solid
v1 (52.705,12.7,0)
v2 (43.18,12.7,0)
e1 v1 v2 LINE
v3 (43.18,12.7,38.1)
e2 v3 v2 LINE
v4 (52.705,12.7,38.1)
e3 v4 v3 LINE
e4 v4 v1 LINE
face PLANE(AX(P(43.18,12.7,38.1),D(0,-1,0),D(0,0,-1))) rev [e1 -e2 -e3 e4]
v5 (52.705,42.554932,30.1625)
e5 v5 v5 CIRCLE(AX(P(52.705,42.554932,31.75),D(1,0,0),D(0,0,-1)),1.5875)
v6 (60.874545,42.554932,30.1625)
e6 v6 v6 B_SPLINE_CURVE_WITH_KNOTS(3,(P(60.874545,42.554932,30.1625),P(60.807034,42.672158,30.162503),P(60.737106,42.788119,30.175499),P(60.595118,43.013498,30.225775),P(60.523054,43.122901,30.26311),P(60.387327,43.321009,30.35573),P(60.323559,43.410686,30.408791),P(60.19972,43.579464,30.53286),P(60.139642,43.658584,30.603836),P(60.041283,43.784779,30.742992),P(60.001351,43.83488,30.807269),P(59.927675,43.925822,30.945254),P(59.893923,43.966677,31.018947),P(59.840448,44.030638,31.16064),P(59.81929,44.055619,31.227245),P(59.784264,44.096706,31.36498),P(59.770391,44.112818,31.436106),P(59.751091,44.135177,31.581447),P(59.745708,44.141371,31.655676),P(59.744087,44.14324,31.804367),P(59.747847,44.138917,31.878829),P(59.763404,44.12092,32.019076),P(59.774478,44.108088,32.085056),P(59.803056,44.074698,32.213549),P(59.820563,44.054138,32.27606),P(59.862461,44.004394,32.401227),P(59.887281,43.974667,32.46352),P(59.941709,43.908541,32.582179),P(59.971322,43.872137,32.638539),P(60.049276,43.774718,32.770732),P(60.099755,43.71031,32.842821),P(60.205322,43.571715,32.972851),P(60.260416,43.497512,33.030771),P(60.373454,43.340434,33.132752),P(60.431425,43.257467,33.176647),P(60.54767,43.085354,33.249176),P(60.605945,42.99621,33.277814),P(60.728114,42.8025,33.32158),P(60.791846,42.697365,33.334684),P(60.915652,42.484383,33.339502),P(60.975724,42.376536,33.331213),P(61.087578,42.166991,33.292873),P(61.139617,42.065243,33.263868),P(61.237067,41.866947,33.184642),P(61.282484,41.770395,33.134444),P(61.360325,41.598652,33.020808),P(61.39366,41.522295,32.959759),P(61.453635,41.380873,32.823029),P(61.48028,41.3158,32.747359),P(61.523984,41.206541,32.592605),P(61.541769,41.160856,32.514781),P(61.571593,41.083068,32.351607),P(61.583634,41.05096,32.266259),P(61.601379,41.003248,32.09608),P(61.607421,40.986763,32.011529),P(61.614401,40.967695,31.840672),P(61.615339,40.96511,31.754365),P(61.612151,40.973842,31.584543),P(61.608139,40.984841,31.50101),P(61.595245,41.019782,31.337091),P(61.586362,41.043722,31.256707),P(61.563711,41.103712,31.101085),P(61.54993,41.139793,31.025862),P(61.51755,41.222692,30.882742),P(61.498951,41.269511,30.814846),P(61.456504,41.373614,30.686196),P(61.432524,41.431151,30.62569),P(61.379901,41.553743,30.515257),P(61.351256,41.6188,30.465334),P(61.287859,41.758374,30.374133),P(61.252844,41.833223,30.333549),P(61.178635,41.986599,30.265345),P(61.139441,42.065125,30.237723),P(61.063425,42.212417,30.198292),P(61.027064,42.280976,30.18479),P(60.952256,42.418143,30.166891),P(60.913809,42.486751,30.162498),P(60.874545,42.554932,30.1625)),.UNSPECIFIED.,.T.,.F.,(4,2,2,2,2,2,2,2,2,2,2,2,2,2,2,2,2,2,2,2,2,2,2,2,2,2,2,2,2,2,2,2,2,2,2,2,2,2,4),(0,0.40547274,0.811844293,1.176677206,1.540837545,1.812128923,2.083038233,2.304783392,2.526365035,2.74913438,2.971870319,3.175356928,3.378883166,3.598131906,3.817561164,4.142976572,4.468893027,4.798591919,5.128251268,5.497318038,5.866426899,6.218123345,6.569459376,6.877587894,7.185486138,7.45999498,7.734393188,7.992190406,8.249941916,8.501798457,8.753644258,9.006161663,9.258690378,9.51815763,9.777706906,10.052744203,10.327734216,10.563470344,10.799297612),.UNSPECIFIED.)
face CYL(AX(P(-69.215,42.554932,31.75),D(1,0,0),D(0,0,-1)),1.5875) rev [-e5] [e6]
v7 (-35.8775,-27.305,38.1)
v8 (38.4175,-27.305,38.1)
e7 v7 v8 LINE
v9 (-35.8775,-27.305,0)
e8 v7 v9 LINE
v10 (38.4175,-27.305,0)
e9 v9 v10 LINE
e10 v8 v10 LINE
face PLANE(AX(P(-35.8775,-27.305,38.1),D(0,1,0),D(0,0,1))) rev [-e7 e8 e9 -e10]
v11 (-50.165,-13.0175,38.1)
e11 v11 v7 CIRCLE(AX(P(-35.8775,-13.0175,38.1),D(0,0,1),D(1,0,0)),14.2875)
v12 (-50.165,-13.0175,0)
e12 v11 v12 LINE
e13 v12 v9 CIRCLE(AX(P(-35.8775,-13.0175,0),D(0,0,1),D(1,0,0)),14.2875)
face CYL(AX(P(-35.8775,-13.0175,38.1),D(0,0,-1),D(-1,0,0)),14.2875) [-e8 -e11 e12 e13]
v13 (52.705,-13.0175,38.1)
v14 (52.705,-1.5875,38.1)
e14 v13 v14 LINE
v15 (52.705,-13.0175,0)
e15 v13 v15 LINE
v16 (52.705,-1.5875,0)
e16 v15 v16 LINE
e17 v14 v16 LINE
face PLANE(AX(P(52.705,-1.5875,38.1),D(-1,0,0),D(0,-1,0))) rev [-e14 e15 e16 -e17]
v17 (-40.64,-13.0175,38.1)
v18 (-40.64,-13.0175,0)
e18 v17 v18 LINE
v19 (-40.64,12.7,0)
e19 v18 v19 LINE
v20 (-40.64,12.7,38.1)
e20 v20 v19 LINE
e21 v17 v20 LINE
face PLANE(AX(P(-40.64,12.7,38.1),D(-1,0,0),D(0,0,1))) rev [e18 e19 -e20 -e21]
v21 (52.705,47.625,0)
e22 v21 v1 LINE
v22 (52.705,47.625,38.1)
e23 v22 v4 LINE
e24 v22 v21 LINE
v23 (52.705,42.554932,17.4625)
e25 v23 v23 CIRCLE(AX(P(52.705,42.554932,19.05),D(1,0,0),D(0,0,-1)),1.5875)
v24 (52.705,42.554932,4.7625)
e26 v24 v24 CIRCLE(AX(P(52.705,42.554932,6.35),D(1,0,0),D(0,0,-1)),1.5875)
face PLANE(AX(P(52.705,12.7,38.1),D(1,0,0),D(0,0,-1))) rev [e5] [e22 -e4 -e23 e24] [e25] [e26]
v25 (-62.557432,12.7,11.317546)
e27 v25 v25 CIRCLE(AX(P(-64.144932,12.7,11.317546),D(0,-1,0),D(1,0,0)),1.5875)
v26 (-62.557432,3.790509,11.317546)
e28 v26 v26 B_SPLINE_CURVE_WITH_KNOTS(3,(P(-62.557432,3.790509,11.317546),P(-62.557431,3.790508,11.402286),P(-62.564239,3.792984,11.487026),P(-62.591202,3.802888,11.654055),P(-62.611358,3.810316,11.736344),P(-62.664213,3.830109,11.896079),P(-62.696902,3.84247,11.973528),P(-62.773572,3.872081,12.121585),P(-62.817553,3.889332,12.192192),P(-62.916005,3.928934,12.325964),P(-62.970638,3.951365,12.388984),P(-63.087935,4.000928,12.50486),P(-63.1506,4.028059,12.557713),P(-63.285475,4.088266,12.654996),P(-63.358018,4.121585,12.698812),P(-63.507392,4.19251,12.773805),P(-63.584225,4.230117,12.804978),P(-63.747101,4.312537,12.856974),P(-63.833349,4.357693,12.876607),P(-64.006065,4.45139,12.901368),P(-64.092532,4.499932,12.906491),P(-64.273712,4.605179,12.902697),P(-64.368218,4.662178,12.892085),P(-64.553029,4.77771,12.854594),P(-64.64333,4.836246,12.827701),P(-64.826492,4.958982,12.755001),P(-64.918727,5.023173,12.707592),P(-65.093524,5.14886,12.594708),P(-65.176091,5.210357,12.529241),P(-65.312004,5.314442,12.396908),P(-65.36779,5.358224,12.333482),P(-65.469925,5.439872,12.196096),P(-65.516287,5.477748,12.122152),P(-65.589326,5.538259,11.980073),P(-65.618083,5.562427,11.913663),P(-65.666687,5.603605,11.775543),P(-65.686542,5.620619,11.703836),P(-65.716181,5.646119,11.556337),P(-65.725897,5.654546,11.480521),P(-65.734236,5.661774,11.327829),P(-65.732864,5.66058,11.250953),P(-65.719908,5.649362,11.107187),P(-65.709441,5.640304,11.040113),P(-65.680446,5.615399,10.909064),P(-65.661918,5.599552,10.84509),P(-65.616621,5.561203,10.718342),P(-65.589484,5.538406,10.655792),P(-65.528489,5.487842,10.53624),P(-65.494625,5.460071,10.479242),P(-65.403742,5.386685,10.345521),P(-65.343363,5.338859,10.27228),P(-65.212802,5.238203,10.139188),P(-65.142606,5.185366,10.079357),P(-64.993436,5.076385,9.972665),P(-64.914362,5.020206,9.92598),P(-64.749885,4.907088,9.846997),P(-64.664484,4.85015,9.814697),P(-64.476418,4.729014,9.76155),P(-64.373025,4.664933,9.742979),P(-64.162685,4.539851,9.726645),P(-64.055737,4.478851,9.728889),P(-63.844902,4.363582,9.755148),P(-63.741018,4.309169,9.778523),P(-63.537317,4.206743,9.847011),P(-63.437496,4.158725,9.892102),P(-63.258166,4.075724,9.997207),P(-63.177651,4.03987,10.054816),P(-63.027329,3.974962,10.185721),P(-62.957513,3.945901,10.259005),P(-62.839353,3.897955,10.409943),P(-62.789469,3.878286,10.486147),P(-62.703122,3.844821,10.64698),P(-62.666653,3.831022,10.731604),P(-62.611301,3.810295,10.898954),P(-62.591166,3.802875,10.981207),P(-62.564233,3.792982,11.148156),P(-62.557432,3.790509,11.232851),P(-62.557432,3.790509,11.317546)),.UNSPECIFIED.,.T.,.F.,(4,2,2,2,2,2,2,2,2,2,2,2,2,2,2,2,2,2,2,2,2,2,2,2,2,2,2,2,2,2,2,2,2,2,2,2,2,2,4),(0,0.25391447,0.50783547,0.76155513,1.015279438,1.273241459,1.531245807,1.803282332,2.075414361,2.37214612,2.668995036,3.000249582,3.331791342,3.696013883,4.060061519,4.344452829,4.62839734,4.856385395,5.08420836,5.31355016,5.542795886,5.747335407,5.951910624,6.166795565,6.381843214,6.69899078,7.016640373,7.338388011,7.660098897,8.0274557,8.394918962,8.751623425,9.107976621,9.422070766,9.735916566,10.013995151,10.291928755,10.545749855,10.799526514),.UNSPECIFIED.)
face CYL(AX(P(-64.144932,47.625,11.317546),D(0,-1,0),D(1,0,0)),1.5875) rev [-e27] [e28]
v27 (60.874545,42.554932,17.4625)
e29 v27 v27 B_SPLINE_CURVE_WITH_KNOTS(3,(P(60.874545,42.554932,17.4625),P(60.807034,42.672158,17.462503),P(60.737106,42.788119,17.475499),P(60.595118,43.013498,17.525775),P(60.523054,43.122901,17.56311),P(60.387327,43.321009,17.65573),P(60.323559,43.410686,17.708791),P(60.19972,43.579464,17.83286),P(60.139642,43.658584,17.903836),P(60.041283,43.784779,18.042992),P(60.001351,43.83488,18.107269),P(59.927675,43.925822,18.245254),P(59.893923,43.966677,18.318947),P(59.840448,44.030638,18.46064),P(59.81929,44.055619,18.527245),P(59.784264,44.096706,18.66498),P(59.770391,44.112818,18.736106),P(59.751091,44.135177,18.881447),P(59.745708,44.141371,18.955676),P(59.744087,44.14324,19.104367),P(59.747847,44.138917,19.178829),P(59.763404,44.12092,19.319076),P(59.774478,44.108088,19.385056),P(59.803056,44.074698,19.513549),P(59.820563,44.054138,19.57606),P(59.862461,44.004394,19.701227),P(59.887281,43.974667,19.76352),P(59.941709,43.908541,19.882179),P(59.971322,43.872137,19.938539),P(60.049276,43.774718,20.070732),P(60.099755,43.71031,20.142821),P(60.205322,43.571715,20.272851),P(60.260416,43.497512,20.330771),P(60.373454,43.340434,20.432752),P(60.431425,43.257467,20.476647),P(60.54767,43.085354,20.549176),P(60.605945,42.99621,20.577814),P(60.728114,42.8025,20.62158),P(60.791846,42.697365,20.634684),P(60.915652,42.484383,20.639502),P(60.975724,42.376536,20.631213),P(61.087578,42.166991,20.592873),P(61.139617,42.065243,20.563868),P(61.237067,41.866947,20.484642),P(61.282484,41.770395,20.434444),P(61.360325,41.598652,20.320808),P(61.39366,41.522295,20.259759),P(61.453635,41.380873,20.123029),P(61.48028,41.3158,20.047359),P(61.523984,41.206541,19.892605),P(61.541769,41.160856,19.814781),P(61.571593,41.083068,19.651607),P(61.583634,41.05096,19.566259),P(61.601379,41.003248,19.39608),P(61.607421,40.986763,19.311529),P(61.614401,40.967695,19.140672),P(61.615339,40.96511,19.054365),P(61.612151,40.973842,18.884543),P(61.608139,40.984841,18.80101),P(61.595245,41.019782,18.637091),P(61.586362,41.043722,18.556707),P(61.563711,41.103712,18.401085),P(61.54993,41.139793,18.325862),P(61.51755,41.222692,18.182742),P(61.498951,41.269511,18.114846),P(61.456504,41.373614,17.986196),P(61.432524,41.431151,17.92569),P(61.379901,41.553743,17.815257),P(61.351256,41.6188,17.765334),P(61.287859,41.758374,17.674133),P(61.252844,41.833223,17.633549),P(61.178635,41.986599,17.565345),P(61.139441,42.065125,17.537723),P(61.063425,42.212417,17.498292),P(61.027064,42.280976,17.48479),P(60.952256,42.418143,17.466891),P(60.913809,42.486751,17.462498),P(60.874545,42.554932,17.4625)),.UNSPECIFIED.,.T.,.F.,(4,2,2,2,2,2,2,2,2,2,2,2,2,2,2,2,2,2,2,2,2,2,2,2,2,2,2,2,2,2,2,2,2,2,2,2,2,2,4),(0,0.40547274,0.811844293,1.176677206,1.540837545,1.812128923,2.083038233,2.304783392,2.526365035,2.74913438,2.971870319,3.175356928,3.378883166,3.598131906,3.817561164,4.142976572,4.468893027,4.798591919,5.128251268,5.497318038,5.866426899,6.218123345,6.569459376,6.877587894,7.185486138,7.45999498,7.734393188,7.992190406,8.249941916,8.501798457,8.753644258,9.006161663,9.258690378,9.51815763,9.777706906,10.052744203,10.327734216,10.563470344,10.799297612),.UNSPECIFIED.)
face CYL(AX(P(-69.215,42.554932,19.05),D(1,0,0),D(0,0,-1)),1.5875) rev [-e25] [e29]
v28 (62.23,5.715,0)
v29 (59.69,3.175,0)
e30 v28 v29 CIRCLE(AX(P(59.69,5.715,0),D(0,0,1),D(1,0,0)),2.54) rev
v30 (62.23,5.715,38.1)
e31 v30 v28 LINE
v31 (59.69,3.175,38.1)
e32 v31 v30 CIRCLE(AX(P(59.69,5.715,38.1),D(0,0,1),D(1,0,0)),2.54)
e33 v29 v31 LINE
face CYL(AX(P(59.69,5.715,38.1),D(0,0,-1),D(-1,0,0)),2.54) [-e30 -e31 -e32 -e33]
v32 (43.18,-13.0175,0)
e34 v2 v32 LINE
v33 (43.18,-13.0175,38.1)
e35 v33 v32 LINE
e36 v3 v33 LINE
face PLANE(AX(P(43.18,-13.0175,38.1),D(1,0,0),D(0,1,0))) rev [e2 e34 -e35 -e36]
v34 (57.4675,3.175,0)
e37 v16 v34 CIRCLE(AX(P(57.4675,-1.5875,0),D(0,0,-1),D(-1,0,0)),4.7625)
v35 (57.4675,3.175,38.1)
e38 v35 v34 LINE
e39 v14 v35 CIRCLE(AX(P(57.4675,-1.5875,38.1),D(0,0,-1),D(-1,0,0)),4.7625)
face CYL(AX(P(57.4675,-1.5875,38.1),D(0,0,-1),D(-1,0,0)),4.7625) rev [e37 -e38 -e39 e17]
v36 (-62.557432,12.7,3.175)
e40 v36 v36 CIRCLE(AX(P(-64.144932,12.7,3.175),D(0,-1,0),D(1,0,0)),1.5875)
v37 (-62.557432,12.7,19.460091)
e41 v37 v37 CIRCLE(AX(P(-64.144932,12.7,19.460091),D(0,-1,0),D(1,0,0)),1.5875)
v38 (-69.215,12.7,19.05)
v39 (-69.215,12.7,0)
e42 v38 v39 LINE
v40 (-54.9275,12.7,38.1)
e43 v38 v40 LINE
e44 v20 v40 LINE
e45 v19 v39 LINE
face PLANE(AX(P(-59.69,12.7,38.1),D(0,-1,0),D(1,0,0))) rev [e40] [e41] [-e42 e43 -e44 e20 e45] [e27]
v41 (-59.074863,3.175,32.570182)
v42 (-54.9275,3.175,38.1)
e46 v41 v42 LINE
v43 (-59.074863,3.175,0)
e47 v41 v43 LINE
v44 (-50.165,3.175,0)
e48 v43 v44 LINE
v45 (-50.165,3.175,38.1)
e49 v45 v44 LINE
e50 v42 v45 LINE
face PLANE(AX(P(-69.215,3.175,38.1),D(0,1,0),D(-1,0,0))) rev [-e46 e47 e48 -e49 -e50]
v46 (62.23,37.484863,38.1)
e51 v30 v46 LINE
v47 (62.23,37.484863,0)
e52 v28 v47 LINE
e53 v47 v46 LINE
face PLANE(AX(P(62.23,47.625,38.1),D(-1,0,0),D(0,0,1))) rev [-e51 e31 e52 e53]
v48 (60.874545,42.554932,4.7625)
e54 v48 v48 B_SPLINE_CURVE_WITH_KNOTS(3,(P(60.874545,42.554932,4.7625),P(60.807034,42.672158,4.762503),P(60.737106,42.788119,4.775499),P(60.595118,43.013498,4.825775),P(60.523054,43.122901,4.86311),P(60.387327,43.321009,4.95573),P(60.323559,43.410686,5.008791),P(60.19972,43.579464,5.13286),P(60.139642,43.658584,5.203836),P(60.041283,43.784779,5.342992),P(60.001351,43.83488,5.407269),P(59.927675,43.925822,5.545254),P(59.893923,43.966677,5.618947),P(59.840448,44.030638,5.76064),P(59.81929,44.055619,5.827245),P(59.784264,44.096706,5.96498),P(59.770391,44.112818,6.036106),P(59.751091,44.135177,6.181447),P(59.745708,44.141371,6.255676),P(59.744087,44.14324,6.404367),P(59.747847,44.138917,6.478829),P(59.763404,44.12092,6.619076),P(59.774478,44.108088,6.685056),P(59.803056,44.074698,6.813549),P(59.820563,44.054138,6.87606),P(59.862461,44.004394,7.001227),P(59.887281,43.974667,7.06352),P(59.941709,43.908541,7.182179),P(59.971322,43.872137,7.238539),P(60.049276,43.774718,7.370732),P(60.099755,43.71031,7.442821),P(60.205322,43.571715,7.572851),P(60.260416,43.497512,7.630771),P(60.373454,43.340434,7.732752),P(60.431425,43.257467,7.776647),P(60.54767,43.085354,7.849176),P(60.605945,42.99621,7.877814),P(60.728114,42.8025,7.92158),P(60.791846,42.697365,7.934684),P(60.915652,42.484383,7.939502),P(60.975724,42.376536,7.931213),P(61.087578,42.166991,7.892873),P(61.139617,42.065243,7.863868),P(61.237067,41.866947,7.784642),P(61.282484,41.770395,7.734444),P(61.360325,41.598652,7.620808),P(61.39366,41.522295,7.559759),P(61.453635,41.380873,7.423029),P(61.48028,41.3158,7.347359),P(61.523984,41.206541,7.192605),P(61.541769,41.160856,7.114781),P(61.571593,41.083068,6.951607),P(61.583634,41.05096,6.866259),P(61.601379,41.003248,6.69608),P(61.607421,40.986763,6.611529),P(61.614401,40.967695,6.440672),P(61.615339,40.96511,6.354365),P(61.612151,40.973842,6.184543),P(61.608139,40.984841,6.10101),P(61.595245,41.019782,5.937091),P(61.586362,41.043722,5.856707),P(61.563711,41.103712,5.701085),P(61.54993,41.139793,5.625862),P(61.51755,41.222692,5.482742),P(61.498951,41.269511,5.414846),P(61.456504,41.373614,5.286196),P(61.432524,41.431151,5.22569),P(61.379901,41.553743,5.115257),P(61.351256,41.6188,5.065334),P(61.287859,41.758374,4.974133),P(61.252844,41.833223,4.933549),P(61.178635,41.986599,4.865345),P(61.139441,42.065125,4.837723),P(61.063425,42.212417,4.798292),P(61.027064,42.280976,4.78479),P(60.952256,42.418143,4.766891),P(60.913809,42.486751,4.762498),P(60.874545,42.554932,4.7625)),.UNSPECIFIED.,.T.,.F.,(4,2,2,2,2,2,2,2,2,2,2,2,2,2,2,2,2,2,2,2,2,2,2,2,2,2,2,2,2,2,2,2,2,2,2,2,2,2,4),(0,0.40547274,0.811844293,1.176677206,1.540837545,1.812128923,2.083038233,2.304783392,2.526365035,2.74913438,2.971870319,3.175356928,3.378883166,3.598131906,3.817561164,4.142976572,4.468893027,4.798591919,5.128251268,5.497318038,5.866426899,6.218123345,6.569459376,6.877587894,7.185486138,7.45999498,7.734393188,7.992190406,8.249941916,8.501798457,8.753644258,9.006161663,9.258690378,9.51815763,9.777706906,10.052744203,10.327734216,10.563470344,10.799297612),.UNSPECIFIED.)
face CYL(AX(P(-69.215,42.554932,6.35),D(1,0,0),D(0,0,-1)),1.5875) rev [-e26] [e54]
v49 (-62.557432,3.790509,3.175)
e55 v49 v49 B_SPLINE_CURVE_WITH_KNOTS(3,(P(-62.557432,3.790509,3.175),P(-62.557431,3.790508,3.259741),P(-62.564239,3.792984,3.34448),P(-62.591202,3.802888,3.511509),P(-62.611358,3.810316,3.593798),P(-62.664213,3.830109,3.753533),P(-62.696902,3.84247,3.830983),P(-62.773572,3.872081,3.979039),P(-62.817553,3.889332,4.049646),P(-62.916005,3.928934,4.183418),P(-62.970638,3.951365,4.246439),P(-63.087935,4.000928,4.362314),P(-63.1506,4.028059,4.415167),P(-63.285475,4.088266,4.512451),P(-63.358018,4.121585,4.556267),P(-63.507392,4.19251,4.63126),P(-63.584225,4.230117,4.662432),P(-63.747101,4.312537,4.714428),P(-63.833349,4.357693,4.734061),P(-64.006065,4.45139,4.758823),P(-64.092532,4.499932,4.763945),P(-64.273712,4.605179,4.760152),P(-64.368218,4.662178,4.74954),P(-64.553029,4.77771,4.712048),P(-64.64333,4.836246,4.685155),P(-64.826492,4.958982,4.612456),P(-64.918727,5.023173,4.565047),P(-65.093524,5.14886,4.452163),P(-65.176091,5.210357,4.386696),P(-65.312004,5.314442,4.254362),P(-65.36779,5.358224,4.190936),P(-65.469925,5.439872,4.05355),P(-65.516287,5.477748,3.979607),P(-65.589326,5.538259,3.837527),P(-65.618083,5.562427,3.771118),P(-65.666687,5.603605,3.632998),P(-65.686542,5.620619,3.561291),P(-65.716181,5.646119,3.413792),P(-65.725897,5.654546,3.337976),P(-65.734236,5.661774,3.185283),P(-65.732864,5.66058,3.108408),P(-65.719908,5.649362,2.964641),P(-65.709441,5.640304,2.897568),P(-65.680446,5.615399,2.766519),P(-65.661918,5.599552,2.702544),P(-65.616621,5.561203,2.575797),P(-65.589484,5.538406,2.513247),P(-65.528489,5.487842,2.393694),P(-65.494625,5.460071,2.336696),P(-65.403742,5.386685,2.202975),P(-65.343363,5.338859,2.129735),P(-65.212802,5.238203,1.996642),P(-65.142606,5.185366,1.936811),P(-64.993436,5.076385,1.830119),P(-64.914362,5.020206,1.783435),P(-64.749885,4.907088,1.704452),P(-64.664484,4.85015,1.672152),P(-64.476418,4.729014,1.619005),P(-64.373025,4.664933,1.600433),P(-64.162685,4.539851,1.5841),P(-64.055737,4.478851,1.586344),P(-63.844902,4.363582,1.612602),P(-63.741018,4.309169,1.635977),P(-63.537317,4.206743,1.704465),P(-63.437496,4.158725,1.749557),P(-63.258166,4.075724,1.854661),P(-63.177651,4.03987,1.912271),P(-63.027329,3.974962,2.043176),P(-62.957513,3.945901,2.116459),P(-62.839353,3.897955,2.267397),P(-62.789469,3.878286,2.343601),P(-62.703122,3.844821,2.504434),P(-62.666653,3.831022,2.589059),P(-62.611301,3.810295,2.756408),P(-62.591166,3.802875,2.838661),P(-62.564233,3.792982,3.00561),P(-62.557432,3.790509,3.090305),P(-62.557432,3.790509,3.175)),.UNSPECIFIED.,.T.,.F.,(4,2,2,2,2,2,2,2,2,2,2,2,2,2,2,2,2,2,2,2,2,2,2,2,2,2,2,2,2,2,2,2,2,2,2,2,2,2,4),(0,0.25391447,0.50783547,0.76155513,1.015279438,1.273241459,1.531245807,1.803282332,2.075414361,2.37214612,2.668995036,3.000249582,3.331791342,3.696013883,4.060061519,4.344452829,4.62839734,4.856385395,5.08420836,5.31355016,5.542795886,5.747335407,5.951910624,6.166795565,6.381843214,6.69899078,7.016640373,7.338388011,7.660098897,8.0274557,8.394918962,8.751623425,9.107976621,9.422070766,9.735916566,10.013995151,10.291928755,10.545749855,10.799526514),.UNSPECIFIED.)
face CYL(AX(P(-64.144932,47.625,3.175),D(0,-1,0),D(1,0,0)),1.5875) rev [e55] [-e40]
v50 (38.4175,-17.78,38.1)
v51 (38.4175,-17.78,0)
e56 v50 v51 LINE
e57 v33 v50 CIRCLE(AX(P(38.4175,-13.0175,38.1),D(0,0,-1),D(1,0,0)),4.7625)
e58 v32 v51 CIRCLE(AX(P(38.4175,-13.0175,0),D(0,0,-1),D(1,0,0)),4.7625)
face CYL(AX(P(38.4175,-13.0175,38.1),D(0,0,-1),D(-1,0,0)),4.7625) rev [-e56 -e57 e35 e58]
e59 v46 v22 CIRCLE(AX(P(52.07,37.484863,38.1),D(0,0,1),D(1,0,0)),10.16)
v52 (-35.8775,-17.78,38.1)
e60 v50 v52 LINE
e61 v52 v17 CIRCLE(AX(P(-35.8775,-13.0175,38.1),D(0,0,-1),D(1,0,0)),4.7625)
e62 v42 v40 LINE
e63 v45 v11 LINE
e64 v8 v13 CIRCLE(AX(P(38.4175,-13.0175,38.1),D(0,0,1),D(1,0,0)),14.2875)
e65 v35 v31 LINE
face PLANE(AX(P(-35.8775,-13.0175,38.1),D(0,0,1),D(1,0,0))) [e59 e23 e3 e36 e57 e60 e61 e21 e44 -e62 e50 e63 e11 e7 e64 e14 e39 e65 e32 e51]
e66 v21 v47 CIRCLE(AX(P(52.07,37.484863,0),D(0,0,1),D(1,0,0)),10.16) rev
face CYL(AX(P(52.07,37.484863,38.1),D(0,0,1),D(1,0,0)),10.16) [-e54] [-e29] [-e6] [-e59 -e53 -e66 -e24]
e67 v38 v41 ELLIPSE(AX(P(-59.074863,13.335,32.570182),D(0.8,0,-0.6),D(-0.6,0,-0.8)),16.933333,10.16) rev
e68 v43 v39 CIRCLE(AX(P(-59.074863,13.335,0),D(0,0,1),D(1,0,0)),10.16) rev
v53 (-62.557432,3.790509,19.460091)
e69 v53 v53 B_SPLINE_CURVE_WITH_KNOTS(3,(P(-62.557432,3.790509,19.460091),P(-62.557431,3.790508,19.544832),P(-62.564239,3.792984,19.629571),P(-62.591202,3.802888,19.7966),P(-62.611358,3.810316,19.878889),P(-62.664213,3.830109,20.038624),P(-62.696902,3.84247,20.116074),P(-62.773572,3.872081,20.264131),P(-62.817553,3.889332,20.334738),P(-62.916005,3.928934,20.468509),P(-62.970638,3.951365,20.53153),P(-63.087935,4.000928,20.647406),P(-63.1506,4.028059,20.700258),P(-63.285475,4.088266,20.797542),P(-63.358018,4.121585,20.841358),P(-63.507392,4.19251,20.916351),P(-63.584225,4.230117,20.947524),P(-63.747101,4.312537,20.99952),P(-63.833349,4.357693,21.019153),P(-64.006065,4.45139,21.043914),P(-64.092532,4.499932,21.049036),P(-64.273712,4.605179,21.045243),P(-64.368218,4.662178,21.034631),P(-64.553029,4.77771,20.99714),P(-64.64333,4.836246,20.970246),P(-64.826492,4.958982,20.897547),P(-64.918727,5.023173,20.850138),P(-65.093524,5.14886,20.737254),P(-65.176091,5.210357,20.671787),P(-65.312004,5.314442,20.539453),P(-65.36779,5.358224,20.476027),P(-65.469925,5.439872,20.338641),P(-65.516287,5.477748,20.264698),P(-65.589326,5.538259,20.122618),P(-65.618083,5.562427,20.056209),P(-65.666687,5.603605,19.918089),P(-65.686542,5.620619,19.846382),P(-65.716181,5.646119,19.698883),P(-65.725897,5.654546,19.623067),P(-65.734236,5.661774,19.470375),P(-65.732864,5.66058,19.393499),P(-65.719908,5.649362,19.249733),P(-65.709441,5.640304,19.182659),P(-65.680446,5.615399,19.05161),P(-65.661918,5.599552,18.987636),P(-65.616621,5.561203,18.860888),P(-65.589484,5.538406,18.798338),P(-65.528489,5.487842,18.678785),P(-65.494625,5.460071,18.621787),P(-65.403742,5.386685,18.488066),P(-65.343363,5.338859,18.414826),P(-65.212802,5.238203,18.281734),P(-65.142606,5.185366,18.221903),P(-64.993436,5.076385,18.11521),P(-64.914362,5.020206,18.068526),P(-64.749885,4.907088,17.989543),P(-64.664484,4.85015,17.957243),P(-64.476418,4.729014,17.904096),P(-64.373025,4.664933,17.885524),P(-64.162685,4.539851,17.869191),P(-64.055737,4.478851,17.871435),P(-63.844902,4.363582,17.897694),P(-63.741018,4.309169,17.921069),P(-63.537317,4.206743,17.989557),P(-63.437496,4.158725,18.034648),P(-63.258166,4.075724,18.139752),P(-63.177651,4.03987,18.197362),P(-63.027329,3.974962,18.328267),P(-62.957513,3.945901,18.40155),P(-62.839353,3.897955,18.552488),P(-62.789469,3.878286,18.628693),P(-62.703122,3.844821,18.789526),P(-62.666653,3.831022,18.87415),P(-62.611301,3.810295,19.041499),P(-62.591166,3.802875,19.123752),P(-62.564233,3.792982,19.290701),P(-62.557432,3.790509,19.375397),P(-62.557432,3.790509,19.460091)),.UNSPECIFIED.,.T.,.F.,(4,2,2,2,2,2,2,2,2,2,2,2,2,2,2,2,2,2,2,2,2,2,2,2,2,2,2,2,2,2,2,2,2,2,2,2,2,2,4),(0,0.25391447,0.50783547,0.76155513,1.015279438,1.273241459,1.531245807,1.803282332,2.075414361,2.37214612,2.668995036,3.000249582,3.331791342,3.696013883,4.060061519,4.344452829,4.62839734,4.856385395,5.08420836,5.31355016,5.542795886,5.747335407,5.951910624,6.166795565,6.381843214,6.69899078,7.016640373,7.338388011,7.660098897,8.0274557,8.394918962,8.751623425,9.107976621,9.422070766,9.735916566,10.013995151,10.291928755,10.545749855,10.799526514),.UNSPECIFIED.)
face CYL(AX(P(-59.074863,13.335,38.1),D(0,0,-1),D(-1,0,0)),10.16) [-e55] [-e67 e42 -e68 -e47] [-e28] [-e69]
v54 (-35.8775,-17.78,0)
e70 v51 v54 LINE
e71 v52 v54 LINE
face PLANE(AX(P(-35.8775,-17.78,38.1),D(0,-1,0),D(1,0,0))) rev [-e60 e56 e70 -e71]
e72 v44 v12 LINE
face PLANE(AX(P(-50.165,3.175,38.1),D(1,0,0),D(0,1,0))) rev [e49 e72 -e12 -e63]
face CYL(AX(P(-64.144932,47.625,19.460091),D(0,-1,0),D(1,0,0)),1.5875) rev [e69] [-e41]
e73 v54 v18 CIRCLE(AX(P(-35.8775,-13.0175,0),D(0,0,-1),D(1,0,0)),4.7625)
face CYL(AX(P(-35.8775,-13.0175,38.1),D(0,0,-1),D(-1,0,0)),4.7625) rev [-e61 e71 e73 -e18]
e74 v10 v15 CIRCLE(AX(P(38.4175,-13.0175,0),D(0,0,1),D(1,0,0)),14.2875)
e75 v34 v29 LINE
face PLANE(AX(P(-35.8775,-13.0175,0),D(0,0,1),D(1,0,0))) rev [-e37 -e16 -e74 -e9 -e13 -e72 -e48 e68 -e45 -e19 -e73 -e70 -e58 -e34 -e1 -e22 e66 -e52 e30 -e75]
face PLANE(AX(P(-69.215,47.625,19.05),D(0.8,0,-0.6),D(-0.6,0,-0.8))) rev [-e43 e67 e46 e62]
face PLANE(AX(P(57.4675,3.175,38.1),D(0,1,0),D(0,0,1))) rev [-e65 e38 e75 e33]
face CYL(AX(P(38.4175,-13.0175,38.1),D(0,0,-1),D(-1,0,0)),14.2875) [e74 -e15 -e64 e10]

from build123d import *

# Parameters (mm, degrees)
BOSS_EXTRUDE1_DEPTH = 38.1
FILLET1_R           = 2.54
FILLET2_R           = 10.16
CUT_EXTRUDE2_DEPTH  = 91.653895256
SKETCH3_R           = 1.5875
CUT_EXTRUDE3_DEPTH  = 91.653895256
SKETCH4_R           = 1.5875
CUT_EXTRUDE4_DEPTH  = 145.905274839


with BuildPart() as part:
    # Sketch1 → Boss-Extrude1 (new body)
    with BuildSketch(Plane.XY):
        with BuildLine():
            Line((-35.8775, -27.305), (38.4175, -27.305))
            ThreePointArc((38.4175, -27.305), (48.520288136, -23.120288136), (52.705, -13.0175))
            Line((52.705, -13.0175), (52.705, -1.5875))
            ThreePointArc((52.705, -1.5875), (54.099903955, 1.780096045), (57.4675, 3.175))
            Line((57.4675, 3.175), (62.23, 3.175))
            Line((62.23, 3.175), (62.23, 47.625))
            Line((62.23, 47.625), (52.705, 47.625))
            Line((52.705, 47.625), (52.705, 12.7))
            Line((52.705, 12.7), (43.18, 12.7))
            Line((43.18, 12.7), (43.18, -13.0175))
            ThreePointArc((43.18, -13.0175), (41.785096045, -16.385096045), (38.4175, -17.78))
            Line((38.4175, -17.78), (-35.8775, -17.78))
            ThreePointArc((-35.8775, -17.78), (-39.245096045, -16.385096045), (-40.64, -13.0175))
            Line((-40.64, -13.0175), (-40.64, 12.7))
            Line((-40.64, 12.7), (-50.165, 12.7))
            Line((-50.165, 12.7), (-59.69, 12.7))
            Line((-59.69, 12.7), (-69.215, 12.7))
            Line((-69.215, 12.7), (-69.215, 3.175))
            Line((-69.215, 3.175), (-50.165, 3.175))
            Line((-50.165, 3.175), (-50.165, -13.0175))
            ThreePointArc((-50.165, -13.0175), (-45.980288136, -23.120288136), (-35.8775, -27.305))
        make_face()
    extrude(amount=BOSS_EXTRUDE1_DEPTH)

    # Fillet1
    fillet1_edges = [part.edges().sort_by_distance(p)[0] for p in [
        (62.23, 3.175, 19.05),
    ]]
    fillet(fillet1_edges, radius=FILLET1_R)

    # Fillet2
    # the kernel refuses this fillet: 10.16 mm, written as the material it takes off along each edge
    with BuildSketch(Plane(origin=(-69.215, 3.175, -25.350342083), x_dir=(1, 0, 0), z_dir=(0, 0, 1))) as fillet2_piece_1:
        with BuildLine():
            CenterArc((10.140136833, 10.16), FILLET2_R, 183.583321698, 86.416678302)
            Line((0, 9.525), (-0.202802737, 9.5123))
            ThreePointArc((-0.202802737, 9.5123), (-0.2032, 4.7625), (-0.2032, 0))
            Line((-0.2032, 0), (0, -0.2032))
            Line((0, -0.2032), (10.140136833, -0.2032))
            Line((10.140136833, -0.2032), (10.140136833, 0))
        make_face()
    extrude(amount=88.800684167, mode=Mode.SUBTRACT)
    with BuildSketch(Plane(origin=(62.23, 47.625, -25.350342083), x_dir=(0, -1, 0), z_dir=(0, 0, 1))) as fillet2_piece_2:
        with BuildLine():
            CenterArc((10.140136833, -10.16), FILLET2_R, 90, 86.416678302)
            Line((0, -9.525), (-0.202802737, -9.5123))
            ThreePointArc((-0.202802737, -9.5123), (-0.2032, -4.7625), (-0.2032, 0))
            Line((-0.2032, 0), (0, 0.2032))
            Line((0, 0.2032), (10.140136833, 0.2032))
            Line((10.140136833, 0.2032), (10.140136833, 0))
        make_face()
    extrude(amount=88.800684167, mode=Mode.SUBTRACT)

    # Sketch2 → Cut-Extrude2 (cut, through all)
    with BuildSketch(Plane.XZ.offset(-3.175)):
        Polygon((-69.215, 19.05), (-69.215, 44.45), (-50.165, 44.45), align=None)
    extrude(amount=-CUT_EXTRUDE2_DEPTH, mode=Mode.SUBTRACT)

    # Sketch3 → Cut-Extrude3 (cut, through all)
    with BuildSketch(Plane.XZ.offset(-3.175)):
        with Locations((-64.144931583, 3.175)):
            Circle(SKETCH3_R)
        with Locations((-64.144931583, 11.317545611)):
            Circle(SKETCH3_R)
        with Locations((-64.144931583, 19.460091222)):
            Circle(SKETCH3_R)
    extrude(amount=-CUT_EXTRUDE3_DEPTH, mode=Mode.SUBTRACT)

    # Sketch4 → Cut-Extrude4 (cut, through all)
    with BuildSketch(Plane(origin=(62.23, 0, 0), x_dir=(0, 0, -1), z_dir=(1, 0, 0))):
        with Locations((-6.35, 42.554931583)):
            Circle(SKETCH4_R)
        with Locations((-19.05, 42.554931583)):
            Circle(SKETCH4_R)
        with Locations((-31.75, 42.554931583)):
            Circle(SKETCH4_R)
    extrude(amount=-CUT_EXTRUDE4_DEPTH, mode=Mode.SUBTRACT)


solid = part.part
